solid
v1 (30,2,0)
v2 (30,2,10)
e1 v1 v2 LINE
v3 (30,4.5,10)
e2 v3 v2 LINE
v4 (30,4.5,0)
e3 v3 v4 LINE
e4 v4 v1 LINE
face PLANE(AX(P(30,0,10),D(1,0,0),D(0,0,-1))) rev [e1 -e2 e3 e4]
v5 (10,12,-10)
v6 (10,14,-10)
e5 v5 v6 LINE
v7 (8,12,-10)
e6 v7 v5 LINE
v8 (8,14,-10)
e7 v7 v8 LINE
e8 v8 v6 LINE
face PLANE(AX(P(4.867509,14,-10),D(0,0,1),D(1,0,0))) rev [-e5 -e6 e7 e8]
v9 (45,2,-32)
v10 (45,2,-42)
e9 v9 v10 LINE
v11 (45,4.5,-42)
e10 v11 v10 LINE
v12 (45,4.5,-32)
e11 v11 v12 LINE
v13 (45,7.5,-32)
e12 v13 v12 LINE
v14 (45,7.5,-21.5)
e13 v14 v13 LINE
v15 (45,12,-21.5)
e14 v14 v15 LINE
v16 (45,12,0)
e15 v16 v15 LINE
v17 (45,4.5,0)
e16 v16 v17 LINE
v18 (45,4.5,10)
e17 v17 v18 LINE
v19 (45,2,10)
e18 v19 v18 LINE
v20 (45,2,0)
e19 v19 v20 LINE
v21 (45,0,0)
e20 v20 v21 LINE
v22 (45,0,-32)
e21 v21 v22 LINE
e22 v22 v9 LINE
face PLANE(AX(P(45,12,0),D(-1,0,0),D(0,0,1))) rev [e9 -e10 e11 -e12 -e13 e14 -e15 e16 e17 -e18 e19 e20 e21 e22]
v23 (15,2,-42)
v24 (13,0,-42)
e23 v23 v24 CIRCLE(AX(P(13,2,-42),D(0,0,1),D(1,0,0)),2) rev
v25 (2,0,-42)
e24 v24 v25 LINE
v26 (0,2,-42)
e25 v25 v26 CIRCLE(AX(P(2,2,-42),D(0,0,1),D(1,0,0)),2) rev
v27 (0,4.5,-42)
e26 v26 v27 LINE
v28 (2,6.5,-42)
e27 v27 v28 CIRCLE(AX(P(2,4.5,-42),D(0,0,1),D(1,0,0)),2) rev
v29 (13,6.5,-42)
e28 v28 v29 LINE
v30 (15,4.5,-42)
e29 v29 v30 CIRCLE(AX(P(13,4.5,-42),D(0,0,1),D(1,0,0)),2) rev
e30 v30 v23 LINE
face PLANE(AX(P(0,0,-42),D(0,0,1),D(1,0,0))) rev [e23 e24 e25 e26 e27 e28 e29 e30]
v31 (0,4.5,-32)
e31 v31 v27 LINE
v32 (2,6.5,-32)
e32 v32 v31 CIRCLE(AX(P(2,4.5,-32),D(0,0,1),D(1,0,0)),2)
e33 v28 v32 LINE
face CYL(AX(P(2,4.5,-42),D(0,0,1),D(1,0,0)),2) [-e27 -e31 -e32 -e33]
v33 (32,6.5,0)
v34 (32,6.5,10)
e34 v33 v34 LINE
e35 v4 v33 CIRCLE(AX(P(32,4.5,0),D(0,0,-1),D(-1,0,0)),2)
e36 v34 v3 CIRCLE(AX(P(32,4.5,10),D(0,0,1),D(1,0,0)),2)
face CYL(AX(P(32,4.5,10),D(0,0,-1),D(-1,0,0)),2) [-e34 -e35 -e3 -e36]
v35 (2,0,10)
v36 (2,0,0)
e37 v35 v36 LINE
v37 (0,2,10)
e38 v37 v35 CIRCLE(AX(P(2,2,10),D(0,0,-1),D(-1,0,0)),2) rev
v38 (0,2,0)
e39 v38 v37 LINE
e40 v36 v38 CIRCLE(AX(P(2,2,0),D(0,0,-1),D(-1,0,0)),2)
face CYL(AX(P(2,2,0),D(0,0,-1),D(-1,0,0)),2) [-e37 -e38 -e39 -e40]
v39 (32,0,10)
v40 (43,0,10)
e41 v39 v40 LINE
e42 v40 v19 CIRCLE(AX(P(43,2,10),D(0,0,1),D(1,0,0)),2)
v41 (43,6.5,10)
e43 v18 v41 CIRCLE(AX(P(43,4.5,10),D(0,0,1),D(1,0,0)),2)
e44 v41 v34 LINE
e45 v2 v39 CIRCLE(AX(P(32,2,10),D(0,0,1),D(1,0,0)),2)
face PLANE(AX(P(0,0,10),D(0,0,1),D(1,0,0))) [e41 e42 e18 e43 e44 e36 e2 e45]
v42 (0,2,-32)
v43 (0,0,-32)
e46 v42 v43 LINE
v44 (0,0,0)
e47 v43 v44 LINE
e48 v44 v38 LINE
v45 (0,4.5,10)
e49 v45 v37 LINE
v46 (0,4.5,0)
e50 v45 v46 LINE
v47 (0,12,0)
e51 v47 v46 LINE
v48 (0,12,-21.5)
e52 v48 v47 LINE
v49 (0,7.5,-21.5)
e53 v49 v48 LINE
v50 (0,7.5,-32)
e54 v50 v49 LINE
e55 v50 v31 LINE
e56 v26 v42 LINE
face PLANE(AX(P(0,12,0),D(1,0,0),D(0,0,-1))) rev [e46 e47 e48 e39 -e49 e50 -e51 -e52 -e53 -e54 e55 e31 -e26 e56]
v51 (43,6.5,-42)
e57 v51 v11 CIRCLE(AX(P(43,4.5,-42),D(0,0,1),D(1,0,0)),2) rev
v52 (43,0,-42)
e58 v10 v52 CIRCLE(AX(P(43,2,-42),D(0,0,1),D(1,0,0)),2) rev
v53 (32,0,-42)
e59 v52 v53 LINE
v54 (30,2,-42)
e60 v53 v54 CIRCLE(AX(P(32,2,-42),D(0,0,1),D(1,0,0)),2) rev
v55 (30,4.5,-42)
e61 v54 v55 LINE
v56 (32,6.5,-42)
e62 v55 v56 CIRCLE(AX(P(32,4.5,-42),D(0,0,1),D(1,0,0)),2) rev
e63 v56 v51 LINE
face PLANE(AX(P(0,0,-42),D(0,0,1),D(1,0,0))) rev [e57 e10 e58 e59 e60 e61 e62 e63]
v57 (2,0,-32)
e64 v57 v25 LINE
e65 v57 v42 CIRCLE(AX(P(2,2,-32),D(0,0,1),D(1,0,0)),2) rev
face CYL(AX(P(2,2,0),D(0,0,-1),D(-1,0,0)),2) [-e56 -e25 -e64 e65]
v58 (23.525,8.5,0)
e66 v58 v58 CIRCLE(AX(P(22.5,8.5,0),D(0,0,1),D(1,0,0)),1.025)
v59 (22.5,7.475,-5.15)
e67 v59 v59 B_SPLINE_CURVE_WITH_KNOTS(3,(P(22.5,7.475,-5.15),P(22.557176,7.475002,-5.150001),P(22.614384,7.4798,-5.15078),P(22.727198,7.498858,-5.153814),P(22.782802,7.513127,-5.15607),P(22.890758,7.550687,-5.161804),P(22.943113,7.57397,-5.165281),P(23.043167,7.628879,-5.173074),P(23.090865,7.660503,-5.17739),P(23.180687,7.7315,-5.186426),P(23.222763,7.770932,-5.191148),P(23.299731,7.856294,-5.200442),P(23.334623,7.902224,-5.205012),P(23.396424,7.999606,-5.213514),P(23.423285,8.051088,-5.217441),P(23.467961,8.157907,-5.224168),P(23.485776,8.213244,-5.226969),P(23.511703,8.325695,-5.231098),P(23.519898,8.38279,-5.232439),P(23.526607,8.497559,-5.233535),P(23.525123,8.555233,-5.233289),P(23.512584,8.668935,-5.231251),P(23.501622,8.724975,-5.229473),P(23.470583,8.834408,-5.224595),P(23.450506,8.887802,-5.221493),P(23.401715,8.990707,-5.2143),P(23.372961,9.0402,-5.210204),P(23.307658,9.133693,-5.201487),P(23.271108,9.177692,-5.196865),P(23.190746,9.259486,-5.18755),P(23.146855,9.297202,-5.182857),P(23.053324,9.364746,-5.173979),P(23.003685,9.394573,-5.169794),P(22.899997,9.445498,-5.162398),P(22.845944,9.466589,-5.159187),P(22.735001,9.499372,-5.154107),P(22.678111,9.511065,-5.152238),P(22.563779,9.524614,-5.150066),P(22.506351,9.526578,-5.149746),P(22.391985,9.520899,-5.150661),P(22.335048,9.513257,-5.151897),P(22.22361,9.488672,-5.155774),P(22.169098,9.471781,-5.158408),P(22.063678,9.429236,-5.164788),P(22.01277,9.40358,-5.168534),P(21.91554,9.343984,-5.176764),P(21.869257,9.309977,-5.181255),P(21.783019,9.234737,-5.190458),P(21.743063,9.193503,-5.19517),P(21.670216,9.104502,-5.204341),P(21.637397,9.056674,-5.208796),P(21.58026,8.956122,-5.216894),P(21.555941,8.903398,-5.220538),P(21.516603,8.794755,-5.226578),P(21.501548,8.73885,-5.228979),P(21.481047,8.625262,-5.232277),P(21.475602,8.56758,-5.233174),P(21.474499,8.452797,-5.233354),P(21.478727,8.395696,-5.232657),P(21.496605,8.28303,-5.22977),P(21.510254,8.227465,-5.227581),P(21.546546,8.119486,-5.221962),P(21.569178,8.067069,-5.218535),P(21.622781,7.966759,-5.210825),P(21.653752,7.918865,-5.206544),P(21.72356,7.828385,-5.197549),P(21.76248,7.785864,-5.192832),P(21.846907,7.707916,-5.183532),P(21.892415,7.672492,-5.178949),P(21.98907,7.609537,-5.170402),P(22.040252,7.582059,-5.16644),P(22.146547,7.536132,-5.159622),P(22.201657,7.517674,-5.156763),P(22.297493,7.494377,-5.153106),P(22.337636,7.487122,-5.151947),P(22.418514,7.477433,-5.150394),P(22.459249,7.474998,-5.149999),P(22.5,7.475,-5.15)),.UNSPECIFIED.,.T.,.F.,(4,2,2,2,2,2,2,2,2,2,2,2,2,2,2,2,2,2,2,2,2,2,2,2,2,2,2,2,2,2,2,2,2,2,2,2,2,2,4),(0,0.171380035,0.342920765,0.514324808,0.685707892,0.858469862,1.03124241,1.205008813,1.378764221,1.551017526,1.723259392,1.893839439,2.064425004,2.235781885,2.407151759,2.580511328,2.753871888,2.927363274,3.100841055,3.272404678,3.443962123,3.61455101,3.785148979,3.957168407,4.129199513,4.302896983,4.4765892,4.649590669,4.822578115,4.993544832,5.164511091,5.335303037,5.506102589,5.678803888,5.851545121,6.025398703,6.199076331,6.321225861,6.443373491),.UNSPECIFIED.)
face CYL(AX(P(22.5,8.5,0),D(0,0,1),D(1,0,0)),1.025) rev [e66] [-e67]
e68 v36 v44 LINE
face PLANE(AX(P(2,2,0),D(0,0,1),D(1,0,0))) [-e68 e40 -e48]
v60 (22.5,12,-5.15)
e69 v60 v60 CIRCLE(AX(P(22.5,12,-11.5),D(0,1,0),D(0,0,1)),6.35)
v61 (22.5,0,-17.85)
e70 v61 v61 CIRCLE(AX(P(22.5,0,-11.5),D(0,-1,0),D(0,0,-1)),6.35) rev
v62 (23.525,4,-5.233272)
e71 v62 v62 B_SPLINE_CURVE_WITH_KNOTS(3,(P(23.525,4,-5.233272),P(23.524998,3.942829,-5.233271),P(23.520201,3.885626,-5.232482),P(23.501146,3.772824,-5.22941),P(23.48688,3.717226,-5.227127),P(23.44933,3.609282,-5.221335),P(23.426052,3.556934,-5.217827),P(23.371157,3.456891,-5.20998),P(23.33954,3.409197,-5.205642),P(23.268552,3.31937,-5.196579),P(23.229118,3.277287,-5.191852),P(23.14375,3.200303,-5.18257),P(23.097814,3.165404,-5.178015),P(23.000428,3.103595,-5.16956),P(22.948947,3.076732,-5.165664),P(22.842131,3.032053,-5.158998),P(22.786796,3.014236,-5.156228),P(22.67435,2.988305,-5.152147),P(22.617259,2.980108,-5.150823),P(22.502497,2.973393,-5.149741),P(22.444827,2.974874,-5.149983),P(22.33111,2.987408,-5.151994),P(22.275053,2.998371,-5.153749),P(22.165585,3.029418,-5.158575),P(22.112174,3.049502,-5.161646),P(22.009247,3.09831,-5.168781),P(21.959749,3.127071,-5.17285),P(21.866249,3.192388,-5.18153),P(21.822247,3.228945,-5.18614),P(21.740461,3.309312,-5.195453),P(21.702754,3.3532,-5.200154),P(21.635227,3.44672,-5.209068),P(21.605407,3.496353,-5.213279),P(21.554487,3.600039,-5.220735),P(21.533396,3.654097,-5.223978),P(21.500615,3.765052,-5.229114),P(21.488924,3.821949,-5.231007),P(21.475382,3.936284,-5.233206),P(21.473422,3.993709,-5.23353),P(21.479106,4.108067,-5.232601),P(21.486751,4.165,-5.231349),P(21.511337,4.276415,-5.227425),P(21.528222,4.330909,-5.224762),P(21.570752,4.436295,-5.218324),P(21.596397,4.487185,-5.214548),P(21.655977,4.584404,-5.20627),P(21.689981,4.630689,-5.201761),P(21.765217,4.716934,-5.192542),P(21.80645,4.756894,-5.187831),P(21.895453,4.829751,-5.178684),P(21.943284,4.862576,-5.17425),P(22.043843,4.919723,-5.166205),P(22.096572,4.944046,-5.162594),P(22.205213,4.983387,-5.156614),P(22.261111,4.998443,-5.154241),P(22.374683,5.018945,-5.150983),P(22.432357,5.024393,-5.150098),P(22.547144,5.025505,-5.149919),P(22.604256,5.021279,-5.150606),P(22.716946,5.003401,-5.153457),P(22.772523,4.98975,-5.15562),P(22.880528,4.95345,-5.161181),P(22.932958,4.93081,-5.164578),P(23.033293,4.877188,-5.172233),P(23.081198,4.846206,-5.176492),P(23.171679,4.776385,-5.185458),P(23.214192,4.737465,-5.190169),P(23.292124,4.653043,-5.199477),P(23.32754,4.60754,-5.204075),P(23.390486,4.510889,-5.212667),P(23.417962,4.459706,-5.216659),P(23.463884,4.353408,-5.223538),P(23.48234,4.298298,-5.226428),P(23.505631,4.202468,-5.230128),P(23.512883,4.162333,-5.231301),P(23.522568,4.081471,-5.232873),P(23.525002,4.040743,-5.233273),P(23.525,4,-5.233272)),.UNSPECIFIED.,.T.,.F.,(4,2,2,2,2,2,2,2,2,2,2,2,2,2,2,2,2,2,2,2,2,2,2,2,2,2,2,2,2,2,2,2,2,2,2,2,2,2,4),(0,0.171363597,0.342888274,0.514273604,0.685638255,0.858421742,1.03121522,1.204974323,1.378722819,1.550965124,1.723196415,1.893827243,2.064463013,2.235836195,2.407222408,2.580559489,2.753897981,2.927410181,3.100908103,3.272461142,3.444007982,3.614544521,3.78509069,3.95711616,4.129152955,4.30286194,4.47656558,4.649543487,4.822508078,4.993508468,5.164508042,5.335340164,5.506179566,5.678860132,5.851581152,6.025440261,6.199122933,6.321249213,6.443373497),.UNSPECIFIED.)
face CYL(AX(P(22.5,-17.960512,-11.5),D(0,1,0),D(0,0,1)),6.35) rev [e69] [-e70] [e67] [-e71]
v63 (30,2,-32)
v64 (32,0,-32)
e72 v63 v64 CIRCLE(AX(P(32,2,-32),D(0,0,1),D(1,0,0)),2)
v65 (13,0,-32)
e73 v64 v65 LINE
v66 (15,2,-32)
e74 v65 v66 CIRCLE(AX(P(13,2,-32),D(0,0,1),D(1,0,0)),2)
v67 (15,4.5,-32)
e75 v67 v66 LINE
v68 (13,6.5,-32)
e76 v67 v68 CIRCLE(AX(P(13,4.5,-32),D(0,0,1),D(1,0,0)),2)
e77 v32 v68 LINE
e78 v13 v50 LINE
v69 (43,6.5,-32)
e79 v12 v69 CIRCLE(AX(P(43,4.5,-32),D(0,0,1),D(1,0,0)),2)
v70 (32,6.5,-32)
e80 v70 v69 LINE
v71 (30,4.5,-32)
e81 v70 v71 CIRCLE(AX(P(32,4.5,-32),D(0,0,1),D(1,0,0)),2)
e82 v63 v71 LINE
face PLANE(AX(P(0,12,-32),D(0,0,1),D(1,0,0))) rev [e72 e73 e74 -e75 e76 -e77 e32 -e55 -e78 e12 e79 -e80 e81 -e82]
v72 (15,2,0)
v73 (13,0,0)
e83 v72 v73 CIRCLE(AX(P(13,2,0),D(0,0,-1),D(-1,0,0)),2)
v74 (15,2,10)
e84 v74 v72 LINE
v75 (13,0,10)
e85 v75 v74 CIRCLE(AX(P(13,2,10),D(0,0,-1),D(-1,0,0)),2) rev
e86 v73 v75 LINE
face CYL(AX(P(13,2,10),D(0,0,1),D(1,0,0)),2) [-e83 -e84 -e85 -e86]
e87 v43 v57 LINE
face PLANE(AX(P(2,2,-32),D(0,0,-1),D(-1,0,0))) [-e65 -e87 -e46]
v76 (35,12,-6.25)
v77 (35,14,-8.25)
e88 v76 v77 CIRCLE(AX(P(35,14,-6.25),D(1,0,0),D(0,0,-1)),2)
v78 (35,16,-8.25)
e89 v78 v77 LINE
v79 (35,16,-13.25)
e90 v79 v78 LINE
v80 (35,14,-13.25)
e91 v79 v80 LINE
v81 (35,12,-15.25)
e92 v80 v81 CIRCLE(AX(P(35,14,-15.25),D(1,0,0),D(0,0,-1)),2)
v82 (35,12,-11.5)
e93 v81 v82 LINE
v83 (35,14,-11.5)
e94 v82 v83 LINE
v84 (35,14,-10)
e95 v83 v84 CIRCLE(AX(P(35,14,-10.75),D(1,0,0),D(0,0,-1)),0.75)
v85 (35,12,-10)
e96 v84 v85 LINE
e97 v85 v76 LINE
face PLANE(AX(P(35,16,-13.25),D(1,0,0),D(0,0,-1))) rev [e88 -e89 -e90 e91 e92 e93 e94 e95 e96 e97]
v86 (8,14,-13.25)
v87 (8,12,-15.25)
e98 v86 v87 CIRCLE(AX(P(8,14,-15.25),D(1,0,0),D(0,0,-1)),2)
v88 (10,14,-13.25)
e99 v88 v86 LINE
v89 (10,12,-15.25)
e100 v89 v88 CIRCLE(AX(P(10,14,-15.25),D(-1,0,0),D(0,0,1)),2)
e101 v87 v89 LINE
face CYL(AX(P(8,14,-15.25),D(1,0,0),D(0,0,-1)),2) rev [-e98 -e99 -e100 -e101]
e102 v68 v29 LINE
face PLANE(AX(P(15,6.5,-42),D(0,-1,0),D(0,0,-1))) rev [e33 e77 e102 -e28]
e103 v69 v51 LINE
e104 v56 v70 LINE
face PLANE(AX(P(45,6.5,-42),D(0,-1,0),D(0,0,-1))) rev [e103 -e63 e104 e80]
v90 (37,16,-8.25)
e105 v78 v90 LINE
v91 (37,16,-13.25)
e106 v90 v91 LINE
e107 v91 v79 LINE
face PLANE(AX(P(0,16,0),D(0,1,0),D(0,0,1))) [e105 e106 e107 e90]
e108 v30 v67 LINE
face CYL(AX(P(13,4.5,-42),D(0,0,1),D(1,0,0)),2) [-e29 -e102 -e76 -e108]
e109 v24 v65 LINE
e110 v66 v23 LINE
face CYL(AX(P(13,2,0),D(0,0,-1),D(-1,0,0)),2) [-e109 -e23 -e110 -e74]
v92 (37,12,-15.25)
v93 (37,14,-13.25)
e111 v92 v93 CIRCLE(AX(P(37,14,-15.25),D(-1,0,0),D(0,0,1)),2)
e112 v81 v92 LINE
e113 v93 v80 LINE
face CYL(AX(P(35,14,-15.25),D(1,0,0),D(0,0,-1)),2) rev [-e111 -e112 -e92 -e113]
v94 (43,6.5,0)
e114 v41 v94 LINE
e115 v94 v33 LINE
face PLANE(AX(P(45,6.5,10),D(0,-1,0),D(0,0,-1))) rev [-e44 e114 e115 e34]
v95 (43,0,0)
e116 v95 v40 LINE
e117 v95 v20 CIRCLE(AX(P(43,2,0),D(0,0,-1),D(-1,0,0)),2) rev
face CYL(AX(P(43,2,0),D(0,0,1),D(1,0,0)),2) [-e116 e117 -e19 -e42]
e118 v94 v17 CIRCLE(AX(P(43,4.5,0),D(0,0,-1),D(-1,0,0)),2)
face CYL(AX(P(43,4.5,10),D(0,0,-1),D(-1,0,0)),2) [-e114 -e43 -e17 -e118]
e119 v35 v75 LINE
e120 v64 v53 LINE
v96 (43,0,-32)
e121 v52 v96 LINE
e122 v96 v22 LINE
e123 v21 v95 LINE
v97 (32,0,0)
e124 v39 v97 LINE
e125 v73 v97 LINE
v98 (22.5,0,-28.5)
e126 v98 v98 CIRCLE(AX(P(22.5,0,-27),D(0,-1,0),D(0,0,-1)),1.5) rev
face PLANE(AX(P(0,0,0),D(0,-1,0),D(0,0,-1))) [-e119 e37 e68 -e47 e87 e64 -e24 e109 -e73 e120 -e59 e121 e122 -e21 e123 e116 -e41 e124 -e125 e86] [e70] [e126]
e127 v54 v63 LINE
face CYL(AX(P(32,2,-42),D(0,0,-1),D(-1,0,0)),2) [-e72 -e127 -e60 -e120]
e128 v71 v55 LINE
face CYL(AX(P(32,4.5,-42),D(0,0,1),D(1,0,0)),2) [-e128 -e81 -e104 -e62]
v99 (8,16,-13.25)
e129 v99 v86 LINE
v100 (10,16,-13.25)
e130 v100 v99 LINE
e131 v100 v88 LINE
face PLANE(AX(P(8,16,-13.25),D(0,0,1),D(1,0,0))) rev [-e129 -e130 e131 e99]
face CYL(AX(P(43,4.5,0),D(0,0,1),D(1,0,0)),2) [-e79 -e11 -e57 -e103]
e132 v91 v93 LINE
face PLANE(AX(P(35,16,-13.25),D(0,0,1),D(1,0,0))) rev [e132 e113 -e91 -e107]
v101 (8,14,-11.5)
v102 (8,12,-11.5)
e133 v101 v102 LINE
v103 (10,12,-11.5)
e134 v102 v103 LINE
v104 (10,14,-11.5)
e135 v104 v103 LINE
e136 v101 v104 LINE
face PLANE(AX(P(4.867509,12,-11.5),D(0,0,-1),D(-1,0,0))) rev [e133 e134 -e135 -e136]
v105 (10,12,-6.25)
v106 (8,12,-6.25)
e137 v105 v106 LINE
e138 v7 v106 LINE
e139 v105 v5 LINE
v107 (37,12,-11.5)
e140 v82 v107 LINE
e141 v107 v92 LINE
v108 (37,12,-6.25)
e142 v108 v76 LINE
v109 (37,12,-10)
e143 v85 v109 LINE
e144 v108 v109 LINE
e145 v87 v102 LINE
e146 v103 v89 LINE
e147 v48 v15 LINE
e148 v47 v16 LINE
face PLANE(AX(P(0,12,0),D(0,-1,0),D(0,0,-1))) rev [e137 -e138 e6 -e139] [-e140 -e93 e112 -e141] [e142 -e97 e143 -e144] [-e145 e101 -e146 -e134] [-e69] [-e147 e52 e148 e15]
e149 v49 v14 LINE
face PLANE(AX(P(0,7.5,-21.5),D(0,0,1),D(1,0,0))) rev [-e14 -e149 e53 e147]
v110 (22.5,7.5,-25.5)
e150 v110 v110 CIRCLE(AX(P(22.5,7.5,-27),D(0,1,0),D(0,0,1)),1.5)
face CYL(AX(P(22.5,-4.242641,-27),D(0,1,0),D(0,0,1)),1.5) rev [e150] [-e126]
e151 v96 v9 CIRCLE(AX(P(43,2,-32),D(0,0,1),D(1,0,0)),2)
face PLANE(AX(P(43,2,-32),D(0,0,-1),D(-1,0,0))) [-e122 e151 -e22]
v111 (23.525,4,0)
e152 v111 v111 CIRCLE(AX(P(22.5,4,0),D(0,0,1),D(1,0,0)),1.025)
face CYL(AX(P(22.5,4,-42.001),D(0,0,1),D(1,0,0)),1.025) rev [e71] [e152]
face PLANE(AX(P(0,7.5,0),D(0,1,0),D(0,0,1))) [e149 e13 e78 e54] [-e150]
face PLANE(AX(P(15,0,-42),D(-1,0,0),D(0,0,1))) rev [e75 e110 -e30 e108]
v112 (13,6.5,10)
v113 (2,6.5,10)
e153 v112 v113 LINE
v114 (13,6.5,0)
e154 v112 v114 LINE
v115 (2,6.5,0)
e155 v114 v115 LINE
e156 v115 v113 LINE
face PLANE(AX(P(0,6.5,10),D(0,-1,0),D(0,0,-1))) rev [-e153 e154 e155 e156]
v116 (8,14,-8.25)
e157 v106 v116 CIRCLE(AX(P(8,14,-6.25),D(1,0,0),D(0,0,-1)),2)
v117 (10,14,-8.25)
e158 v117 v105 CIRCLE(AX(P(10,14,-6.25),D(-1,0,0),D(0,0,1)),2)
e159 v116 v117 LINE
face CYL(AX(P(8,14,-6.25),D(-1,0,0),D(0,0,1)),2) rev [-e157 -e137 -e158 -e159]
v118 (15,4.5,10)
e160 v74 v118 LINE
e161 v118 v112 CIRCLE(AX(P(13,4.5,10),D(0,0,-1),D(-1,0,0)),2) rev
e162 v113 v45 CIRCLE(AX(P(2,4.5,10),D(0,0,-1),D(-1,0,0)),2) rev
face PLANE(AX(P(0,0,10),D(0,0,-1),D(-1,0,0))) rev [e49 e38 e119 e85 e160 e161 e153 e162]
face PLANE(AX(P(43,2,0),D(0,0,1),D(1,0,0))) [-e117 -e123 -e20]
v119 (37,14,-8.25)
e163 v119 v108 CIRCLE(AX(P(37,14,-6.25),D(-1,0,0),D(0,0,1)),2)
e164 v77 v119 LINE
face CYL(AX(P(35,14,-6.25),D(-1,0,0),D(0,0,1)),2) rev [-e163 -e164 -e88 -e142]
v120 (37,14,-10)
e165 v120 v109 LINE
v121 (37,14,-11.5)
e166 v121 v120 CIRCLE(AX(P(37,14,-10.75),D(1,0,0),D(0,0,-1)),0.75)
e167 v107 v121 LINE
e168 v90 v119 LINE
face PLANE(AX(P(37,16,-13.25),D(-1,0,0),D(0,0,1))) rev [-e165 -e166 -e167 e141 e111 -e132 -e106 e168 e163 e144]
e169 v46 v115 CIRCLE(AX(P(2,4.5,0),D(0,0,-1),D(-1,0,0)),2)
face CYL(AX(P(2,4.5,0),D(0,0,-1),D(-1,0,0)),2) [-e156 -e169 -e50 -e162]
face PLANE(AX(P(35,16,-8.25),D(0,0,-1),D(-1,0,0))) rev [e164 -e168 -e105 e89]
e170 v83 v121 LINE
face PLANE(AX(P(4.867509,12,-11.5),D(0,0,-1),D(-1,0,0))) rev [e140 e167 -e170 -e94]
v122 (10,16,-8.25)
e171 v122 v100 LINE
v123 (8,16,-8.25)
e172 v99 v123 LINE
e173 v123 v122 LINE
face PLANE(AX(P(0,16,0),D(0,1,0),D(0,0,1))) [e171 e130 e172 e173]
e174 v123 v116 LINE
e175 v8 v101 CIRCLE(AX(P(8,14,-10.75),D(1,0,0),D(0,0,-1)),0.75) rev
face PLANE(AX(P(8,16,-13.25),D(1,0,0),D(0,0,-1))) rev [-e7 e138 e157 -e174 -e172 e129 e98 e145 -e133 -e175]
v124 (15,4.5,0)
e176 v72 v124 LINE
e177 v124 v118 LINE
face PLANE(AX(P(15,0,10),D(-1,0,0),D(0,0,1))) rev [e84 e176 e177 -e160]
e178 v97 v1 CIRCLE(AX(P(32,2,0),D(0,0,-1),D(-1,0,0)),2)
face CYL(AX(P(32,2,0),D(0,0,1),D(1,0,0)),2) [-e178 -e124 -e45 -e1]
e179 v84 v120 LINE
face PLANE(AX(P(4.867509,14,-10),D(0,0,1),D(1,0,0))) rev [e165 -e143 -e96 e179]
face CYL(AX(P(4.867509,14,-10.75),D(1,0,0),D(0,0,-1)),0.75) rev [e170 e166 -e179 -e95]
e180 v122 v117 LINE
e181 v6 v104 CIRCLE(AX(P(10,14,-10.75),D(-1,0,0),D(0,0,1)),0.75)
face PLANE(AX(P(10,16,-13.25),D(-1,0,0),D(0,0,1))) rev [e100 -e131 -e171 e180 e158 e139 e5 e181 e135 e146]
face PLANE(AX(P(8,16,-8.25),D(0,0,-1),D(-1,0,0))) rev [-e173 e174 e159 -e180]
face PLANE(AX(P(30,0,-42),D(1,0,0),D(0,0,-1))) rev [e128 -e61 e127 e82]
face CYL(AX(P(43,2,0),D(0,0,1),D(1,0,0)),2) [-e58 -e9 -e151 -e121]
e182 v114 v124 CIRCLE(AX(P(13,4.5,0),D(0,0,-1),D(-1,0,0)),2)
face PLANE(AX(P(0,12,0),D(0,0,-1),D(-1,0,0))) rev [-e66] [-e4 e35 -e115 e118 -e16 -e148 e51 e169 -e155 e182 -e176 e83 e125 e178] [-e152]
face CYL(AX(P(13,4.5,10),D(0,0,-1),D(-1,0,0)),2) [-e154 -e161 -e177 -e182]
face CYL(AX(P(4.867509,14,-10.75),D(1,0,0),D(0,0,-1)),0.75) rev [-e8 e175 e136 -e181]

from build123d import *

# Parameters (mm, degrees)
SKETCH1_W                    = 45
SKETCH1_H                    = 32
BOSS_EXTRUDE1_DEPTH          = 12
SKETCH2_W                    = 45
SKETCH2_H                    = 10.5
CUT_EXTRUDE1_DEPTH           = 4.5
SKETCH3_R                    = 1.5
CUT_EXTRUDE2_DEPTH           = 7.5
SKETCH4_R                    = 6.35
CUT_EXTRUDE3_DEPTH           = 12
SKETCH5_W                    = 15
SKETCH5_H                    = 6.5
BOSS_EXTRUDE3_DEPTH          = 10
SKETCH6_W                    = 15
SKETCH6_H                    = 6.5
BOSS_EXTRUDE4_DEPTH          = 10
SKETCH7_W                    = 2
SKETCH7_H                    = 5
BOSS_EXTRUDE5_DEPTH          = 4
M2_5X0_45_TAPPED_HOLE1_D     = 2.05
M2_5X0_45_TAPPED_HOLE1_DEPTH = 11.499
M2_5X0_45_TAPPED_HOLE1_TIP   = 0.615882135
CUT_EXTRUDE4_REACH           = 65.6
CUT_EXTRUDE4_END_RADIUS      = 6.35
SKETCH10_R                   = 1.025
FILLET1_DEPTH                = 11
FILLET2_R                    = 2
FILLET3_DEPTH                = 11
FILLET4_R                    = 2
FILLET5_START                = -43
FILLET5_DEPTH                = 11
FILLET6_START                = -43
FILLET6_DEPTH                = 11
FILLET7_R                    = 2
CUT_EXTRUDE5_REACH           = 60.215
FILLET8_R                    = 2


with BuildPart() as part:
    # Sketch1 → Boss-Extrude1 (new body)
    with BuildSketch(Plane(origin=(0, 0, 0), x_dir=(1, 0, 0), z_dir=(0, 1, 0))):
        with Locations((22.5, 16)):
            Rectangle(SKETCH1_W, SKETCH1_H)
    extrude(amount=BOSS_EXTRUDE1_DEPTH)

    # Sketch2 → Cut-Extrude1 (cut)
    with BuildSketch(Plane(origin=(0, 12, 0), x_dir=(1, 0, 0), z_dir=(0, 1, 0))):
        with Locations((22.5, 26.75)):
            Rectangle(SKETCH2_W, SKETCH2_H)
    extrude(amount=-CUT_EXTRUDE1_DEPTH, mode=Mode.SUBTRACT)

    # Sketch3 → Cut-Extrude2 (cut)
    with BuildSketch(Plane(origin=(0, 7.5, 0), x_dir=(1, 0, 0), z_dir=(0, 1, 0))):
        with Locations(Location((22.5, 27, 0), (0, 0, 270))):
            Circle(SKETCH3_R)
    extrude(amount=-CUT_EXTRUDE2_DEPTH, mode=Mode.SUBTRACT)

    # Sketch4 → Cut-Extrude3 (cut)
    with BuildSketch(Plane(origin=(0, 12, 0), x_dir=(1, 0, 0), z_dir=(0, 1, 0))):
        with Locations(Location((22.5, 11.5, 0), (0, 0, 270))):
            Circle(SKETCH4_R)
    extrude(amount=-CUT_EXTRUDE3_DEPTH, mode=Mode.SUBTRACT)

    # Sketch5 → Boss-Extrude3 (add)
    with BuildSketch(Plane(origin=(0, 0, -32), x_dir=(-1, 0, 0), z_dir=(0, 0, -1))):
        with Locations((-37.5, 3.25)):
            Rectangle(SKETCH5_W, SKETCH5_H)
        with Locations((-7.5, 3.25)):
            Rectangle(SKETCH5_W, SKETCH5_H)
    extrude(amount=BOSS_EXTRUDE3_DEPTH)

    # Sketch6 → Boss-Extrude4 (add)
    with BuildSketch(Plane.XY):
        with Locations((7.5, 3.25)):
            Rectangle(SKETCH6_W, SKETCH6_H)
        with Locations((37.5, 3.25)):
            Rectangle(SKETCH6_W, SKETCH6_H)
    extrude(amount=BOSS_EXTRUDE4_DEPTH)

    # Sketch7 → Boss-Extrude5 (add)
    with BuildSketch(Plane(origin=(0, 12, 0), x_dir=(1, 0, 0), z_dir=(0, 1, 0))):
        with Locations((9, 10.75)):
            Rectangle(SKETCH7_W, SKETCH7_H)
        with Locations((36, 10.75)):
            Rectangle(SKETCH7_W, SKETCH7_H)
    extrude(amount=BOSS_EXTRUDE5_DEPTH)

    # M2.5x0.45 Tapped Hole1
    with Locations(Plane.XY):
        with Locations((22.5, 8.5)):
            Hole(M2_5X0_45_TAPPED_HOLE1_D / 2, depth=M2_5X0_45_TAPPED_HOLE1_DEPTH)
            with Locations((0, 0, -(M2_5X0_45_TAPPED_HOLE1_DEPTH + M2_5X0_45_TAPPED_HOLE1_TIP / 2))):  # 118° drill point
                Cone(0, M2_5X0_45_TAPPED_HOLE1_D / 2, M2_5X0_45_TAPPED_HOLE1_TIP, mode=Mode.SUBTRACT)

    # Cut-Extrude4: up to this cylinder (the profile starts outside it)
    cut_extrude4_end = Plane(origin=(22.5, 4, -11.5), z_dir=(0, 1, 0)) * Cylinder(CUT_EXTRUDE4_END_RADIUS, 144.9, mode=Mode.PRIVATE)
    # Sketch10 → Cut-Extrude4 (cut, up to the surface)
    with BuildSketch(Plane.XY, mode=Mode.PRIVATE) as cut_extrude4_sk1:
        with Locations((22.5, 4)):
            Circle(SKETCH10_R)
    cut_extrude4_tool1 = extrude(cut_extrude4_sk1.sketch, amount=-CUT_EXTRUDE4_REACH, mode=Mode.PRIVATE) - cut_extrude4_end
    add(cut_extrude4_tool1.solids().sort_by_distance((22.5, 4, 0))[0], mode=Mode.SUBTRACT)

    # Fillet1: read off the stored shape, not the designer's step
    # Fillet1 outline → Fillet1 (cut)
    with BuildSketch(Plane.XY):
        with BuildLine():
            Line((0, 0), (2, 0))
            ThreePointArc((2, 0), (0.585786438, 0.585786438), (0, 2))
            Line((0, 2), (0, 0))
        make_face()
    extrude(amount=FILLET1_DEPTH, mode=Mode.SUBTRACT)

    # Fillet2
    fillet2_edges = [part.edges().sort_by_distance(p)[0] for p in [
        (15, 0, 5),
        (30, 0, 5),
    ]]
    fillet(fillet2_edges, radius=FILLET2_R)

    # Fillet3: read off the stored shape, not the designer's step
    # Fillet3 outline → Fillet3 (cut)
    with BuildSketch(Plane.XY):
        with BuildLine():
            ThreePointArc((45, 2), (44.414213562, 0.585786438), (43, 0))
            Line((43, 0), (45, 0))
            Line((45, 0), (45, 2))
        make_face()
    extrude(amount=FILLET3_DEPTH, mode=Mode.SUBTRACT)

    # Fillet4
    fillet4_edges = [part.edges().sort_by_distance(p)[0] for p in [
        (30, 0, -37),
        (15, 0, -37),
    ]]
    fillet(fillet4_edges, radius=FILLET4_R)

    # Fillet5: read off the stored shape, not the designer's step
    # Fillet5 outline → Fillet5 (cut)
    with BuildSketch(Plane.XY.offset(FILLET5_START)):
        with BuildLine():
            ThreePointArc((45, 2), (44.414213562, 0.585786438), (43, 0))
            Line((43, 0), (45, 0))
            Line((45, 0), (45, 2))
        make_face()
    extrude(amount=FILLET5_DEPTH, mode=Mode.SUBTRACT)

    # Fillet6: read off the stored shape, not the designer's step
    # Fillet6 outline → Fillet6 (cut)
    with BuildSketch(Plane.XY.offset(FILLET6_START)):
        with BuildLine():
            Line((0, 0), (2, 0))
            ThreePointArc((2, 0), (0.585786438, 0.585786438), (0, 2))
            Line((0, 2), (0, 0))
        make_face()
    extrude(amount=FILLET6_DEPTH, mode=Mode.SUBTRACT)

    # Fillet7
    fillet7_edges = [part.edges().sort_by_distance(p)[0] for p in [
        (45, 6.5, -37),
        (30, 6.5, -37),
        (15, 6.5, -37),
        (0, 6.5, -37),
        (0, 6.5, 5),
        (15, 6.5, 5),
        (45, 6.5, 5),
        (30, 6.5, 5),
    ]]
    fillet(fillet7_edges, radius=FILLET7_R)

    # Cut-Extrude5: up to this face of the body (flat: up to its plane)
    cut_extrude5_end = Plane(part.part.faces().sort_by_distance((8, 14, -10.75))[0])
    # Sketch11 → Cut-Extrude5 (cut, up to the picked face)
    with BuildSketch(Plane(origin=(37, 0, 0), x_dir=(0, 0, -1), z_dir=(1, 0, 0)), mode=Mode.PRIVATE) as cut_extrude5_sk1:
        with BuildLine():
            Line((10, 14), (10, 12))
            Line((10, 12), (11.5, 12))
            Line((11.5, 12), (11.5, 14))
            ThreePointArc((11.5, 14), (10.75, 14.75), (10, 14))
        make_face()
    cut_extrude5_tool1 = split(extrude(cut_extrude5_sk1.sketch, amount=-CUT_EXTRUDE5_REACH, mode=Mode.PRIVATE), bisect_by=cut_extrude5_end, keep=Keep.BOTH, mode=Mode.PRIVATE)
    add(cut_extrude5_tool1.solids().sort_by(Axis((37, 13.299936, -10.75), (-1, 0, 0)))[0], mode=Mode.SUBTRACT)

    # Fillet8
    fillet8_edges = [part.edges().sort_by_distance(p)[0] for p in [
        (36, 12, -13.25),
        (9, 12, -8.25),
        (9, 12, -13.25),
        (36, 12, -8.25),
    ]]
    fillet(fillet8_edges, radius=FILLET8_R)


solid = part.part
